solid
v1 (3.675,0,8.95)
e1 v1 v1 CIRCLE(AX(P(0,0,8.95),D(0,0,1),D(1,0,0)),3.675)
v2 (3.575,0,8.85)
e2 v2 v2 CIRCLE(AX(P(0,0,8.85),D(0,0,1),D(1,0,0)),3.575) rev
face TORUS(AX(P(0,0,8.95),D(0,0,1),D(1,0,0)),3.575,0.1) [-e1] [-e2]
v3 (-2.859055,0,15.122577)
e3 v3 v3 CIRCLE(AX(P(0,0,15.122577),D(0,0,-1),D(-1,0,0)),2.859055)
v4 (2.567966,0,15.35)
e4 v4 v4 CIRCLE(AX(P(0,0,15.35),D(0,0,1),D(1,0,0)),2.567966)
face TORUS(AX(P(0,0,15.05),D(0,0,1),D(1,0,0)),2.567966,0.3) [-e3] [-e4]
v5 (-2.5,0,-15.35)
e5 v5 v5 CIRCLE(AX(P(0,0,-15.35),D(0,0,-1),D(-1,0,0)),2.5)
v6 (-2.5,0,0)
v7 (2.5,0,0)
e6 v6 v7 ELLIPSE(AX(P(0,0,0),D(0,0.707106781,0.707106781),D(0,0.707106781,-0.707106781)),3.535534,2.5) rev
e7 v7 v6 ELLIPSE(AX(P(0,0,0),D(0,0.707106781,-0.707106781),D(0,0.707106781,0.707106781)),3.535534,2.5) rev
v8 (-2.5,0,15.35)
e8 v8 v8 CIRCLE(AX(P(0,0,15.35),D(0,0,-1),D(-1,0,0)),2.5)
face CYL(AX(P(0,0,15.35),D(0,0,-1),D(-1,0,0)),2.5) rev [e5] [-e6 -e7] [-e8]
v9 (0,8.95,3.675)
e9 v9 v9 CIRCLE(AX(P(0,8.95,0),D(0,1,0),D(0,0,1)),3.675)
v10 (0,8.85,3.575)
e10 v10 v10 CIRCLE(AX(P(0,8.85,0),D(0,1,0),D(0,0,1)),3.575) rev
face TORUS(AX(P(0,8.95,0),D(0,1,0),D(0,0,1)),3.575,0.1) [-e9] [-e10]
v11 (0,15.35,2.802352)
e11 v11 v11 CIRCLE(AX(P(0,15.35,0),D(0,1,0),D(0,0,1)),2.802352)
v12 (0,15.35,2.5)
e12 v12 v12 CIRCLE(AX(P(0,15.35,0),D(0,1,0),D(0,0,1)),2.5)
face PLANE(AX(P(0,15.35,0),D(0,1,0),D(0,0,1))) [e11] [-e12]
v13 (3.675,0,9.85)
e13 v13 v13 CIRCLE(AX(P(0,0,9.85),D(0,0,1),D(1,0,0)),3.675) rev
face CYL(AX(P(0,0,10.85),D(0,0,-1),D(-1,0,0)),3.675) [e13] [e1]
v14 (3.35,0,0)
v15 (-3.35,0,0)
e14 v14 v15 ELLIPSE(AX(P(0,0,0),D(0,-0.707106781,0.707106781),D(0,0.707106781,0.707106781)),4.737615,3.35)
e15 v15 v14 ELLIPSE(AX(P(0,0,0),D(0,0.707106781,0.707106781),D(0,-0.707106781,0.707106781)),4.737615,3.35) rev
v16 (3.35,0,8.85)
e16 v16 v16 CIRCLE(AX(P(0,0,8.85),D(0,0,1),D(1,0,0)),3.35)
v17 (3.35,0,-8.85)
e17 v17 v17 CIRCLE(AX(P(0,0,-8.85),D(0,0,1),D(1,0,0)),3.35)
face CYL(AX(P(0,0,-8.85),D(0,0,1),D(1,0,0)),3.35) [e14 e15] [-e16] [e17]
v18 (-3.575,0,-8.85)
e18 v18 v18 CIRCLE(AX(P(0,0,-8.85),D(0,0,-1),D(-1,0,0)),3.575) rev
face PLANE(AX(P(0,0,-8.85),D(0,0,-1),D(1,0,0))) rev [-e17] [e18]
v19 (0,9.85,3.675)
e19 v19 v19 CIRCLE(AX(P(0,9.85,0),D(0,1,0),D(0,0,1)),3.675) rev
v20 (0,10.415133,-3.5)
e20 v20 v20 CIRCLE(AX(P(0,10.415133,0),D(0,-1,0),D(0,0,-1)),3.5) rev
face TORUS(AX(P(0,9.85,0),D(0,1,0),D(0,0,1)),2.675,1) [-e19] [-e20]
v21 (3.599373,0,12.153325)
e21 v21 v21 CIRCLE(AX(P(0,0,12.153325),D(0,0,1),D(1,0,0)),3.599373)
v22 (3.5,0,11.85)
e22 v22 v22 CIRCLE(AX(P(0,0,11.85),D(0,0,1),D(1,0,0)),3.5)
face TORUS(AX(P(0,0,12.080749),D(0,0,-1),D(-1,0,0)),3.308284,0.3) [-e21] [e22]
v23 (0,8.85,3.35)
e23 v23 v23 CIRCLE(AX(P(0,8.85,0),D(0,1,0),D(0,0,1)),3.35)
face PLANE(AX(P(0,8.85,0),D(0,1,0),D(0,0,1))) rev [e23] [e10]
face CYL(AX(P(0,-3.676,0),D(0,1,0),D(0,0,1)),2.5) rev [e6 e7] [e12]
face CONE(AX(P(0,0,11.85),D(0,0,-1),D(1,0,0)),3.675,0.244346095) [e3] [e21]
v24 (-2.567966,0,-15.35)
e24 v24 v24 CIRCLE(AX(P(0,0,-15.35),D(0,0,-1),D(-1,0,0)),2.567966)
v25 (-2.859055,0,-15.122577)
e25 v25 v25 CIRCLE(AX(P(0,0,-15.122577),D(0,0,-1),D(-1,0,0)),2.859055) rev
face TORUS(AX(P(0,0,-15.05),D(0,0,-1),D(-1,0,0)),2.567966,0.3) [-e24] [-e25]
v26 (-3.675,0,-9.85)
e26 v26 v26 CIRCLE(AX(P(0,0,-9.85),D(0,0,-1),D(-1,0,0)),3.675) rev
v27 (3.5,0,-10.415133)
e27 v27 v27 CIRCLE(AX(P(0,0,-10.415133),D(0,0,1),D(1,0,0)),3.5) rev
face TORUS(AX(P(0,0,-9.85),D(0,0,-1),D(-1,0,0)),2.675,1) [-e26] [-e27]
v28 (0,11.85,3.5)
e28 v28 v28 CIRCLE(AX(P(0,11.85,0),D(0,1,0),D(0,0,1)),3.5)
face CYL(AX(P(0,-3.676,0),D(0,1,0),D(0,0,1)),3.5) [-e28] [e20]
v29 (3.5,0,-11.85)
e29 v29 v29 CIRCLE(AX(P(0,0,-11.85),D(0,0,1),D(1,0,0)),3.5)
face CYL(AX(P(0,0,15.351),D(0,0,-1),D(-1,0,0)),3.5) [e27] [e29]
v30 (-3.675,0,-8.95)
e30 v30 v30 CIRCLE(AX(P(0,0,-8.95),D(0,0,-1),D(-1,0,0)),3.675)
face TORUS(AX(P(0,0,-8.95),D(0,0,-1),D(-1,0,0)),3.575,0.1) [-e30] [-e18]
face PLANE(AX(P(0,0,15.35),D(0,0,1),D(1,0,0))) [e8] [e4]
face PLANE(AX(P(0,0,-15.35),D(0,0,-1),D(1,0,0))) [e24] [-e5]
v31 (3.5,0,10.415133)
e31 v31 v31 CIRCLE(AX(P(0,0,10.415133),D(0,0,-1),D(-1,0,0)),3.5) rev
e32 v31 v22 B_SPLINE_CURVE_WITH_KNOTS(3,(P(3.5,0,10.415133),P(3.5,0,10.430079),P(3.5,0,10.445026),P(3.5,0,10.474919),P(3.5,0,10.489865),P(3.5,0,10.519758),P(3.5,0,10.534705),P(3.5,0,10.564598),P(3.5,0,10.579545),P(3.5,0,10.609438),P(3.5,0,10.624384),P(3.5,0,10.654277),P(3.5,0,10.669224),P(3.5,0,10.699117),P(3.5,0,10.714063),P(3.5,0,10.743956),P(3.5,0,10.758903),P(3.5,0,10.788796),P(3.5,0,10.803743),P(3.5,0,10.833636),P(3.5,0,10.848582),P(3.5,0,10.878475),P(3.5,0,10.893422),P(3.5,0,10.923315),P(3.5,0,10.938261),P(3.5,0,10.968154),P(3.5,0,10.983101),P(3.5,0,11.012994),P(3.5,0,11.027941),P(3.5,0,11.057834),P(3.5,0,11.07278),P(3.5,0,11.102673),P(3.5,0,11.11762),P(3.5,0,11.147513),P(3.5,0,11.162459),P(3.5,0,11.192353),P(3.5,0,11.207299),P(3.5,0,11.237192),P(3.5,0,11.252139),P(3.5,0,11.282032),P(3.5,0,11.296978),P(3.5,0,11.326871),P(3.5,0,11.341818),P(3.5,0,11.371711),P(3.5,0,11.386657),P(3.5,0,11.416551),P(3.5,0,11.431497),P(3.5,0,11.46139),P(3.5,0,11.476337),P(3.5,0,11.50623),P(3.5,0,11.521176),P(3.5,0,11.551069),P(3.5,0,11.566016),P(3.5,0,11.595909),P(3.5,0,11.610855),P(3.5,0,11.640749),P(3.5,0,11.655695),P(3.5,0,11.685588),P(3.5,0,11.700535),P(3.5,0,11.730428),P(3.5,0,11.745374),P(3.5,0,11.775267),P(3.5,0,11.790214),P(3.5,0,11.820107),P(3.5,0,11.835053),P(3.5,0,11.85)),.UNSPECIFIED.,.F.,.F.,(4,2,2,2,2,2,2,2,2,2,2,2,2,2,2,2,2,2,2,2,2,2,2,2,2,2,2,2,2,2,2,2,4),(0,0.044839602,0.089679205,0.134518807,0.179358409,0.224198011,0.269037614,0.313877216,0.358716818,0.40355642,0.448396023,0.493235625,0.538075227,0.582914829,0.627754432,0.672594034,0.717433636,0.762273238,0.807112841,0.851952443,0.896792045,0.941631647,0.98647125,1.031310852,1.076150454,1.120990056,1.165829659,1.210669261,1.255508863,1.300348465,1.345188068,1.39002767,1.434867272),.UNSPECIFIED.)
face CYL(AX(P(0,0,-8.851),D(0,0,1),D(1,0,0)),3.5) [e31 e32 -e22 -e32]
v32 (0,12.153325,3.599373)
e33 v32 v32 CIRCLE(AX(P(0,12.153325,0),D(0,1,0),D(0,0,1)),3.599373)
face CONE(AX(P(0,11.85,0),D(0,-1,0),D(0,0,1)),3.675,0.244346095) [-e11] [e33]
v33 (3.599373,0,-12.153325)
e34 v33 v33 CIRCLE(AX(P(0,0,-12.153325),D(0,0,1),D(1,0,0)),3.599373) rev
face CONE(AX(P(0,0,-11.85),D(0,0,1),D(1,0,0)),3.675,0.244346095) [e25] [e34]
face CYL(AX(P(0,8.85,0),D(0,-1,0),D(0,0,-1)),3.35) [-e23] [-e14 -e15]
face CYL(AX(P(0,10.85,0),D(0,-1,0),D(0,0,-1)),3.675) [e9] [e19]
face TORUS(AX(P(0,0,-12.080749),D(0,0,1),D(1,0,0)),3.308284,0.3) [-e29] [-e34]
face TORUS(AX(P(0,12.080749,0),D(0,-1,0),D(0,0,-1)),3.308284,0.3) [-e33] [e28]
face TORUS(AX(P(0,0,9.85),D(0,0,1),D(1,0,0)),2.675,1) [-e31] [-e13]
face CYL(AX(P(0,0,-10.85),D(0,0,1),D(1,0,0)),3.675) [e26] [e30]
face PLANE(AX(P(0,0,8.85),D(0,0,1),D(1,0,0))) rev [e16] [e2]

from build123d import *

# Parameters (mm, degrees)
BOSS_EXTRUDE1_DEPTH             = 8.85
BOSS_EXTRUDE1_DEPTH_BACK        = 8.85
SKETCH1_R                       = 3.35
SKETCH2_R                       = 3.675
BOSS_EXTRUDE2_DEPTH             = 2
FILLET1_R                       = 1
SKETCH4_R                       = 3.5
BOSS_EXTRUDE3_DEPTH             = 1
BOSS_EXTRUDE3_DIRECTION_2_REACH = 22.374
SKETCH5_R                       = 3.675
BOSS_EXTRUDE4_DEPTH             = 3.5
BOSS_EXTRUDE4_TAPER             = 14
FILLET2_R                       = 0.3
FILLET3_R                       = 0.1
SKETCH7_R                       = 3.35
BOSS_EXTRUDE5_DEPTH             = 8.85
SKETCH6_R                       = 2.5
CUT_EXTRUDE1_DEPTH              = 33.160816621
SKETCH8_R                       = 3.675
BOSS_EXTRUDE6_DEPTH             = 2
FILLET4_R                       = 1
SKETCH9_R                       = 3.5
BOSS_EXTRUDE7_DEPTH             = 1
BOSS_EXTRUDE7_DIRECTION_2_REACH = 23.45
SKETCH10_R                      = 3.675
BOSS_EXTRUDE8_DEPTH             = 3.5
BOSS_EXTRUDE8_TAPER             = 14
CUT_EXTRUDE2_REACH              = 26.72
CUT_EXTRUDE2_END_RADIUS         = 2.5
SKETCH11_R                      = 2.5
FILLET5_R                       = 0.3
FILLET6_R                       = 0.1


# Read off the part's stored shape, not the designer's step: Mirror1
with BuildPart() as part:
    # Sketch1 → Boss-Extrude1 (new, two sides: drawn at the far end of the back side and taken through both)
    with BuildSketch(Plane.XY.offset(-BOSS_EXTRUDE1_DEPTH_BACK)):
        Circle(SKETCH1_R)
    extrude(amount=BOSS_EXTRUDE1_DEPTH + BOSS_EXTRUDE1_DEPTH_BACK)

    # Sketch2 → Boss-Extrude2 (add)
    with BuildSketch(Plane.XY.offset(8.85)):
        Circle(SKETCH2_R)
    extrude(amount=BOSS_EXTRUDE2_DEPTH)

    # Fillet1
    fillet1_edges = [part.edges().sort_by_distance(p)[0] for p in [
        (-3.675, 0, 10.85),
    ]]
    fillet(fillet1_edges, radius=FILLET1_R)

    # Sketch4 → Boss-Extrude3 (add)
    with BuildSketch(Plane.XY.offset(10.85)):
        Circle(SKETCH4_R)
    extrude(amount=BOSS_EXTRUDE3_DEPTH)

    # Sketch4 → Boss-Extrude3 direction 2 (add, up to next)
    with BuildSketch(Plane.XY.offset(10.85), mode=Mode.PRIVATE) as boss_extrude3_direction_2_sk1:
        Circle(SKETCH4_R)
    boss_extrude3_direction_2_tool1 = extrude(boss_extrude3_direction_2_sk1.sketch, amount=-BOSS_EXTRUDE3_DIRECTION_2_REACH, mode=Mode.PRIVATE) - part.part
    add(boss_extrude3_direction_2_tool1.solids().sort_by_distance((0, 0, 10.85))[0])

    # Sketch5 → Boss-Extrude4 (add)
    with BuildSketch(Plane.XY.offset(11.85)):
        Circle(SKETCH5_R)
    extrude(amount=BOSS_EXTRUDE4_DEPTH, taper=BOSS_EXTRUDE4_TAPER)

    # Fillet2
    # the kernel refuses this fillet: 0.3 mm, written as the material it takes off along each edge
    with BuildSketch(Plane(origin=(0, 0, 11.85), x_dir=(1, 0, 0), z_dir=(0, 1, 0))) as fillet2_piece_1:
        with BuildLine():
            CenterArc((3.308283827, -0.230748584), FILLET2_R, 346, 64.278692047)
            Line((3.599372545, -0.303325153), (3.60519432, -0.304776684))
            Line((3.60519432, -0.304776684), (3.680821774, -0.001451531))
            Line((3.680821774, -0.001451531), (3.675, 0.006))
            ThreePointArc((3.675, 0.006), (3.5875, 0.006), (3.503834323, 0.004614972))
            Line((3.503834323, 0.004614972), (3.5, 0))
        make_face()
    revolve(axis=Axis((0, 0, 11.85), (0, 0, -1)), mode=Mode.SUBTRACT)
    with BuildSketch(Plane(origin=(0, 0, 15.35), x_dir=(1, 0, 0), z_dir=(0, 1, 0))) as fillet2_piece_2:
        with BuildLine():
            CenterArc((2.80235199 - FILLET2_R * 0.781285626507, FILLET2_R), FILLET2_R, 270, 76)
            Line((2.80235199 - FILLET2_R * 0.781285626507, 0), (2.80235199 - FILLET2_R * 0.781285626507, -FILLET2_R * 0.02))
            Line((2.80235199 - FILLET2_R * 0.781285626507, -FILLET2_R * 0.02), (2.80235199 + FILLET2_R * 0.0156257125301, -FILLET2_R * 0.02))
            Line((2.80235199 + FILLET2_R * 0.0156257125301, -FILLET2_R * 0.02), (2.80235199 + FILLET2_R * 0.208416014295, FILLET2_R * 0.753239666488))
            Line((2.80235199 + FILLET2_R * 0.208416014295, FILLET2_R * 0.753239666488), (2.80235199 + FILLET2_R * 0.189010099769, FILLET2_R * 0.7580781044))
        make_face()
    revolve(axis=Axis((0, 0, 15.35), (0, 0, -1)), mode=Mode.SUBTRACT)

    # Fillet3
    fillet3_edges = [part.edges().sort_by_distance(p)[0] for p in [
        (-3.675, 0, 8.85),
    ]]
    fillet(fillet3_edges, radius=FILLET3_R)

    # Mirror1 outline → Mirror1 (revolve)
    with BuildSketch(Plane.XZ):
        with BuildLine():
            ThreePointArc((3.5, -10.415132728), (3.630248659, -10.145803989), (3.675, -9.85))
            Line((3.675, -9.85), (3.675, -8.95))
            ThreePointArc((3.675, -8.95), (3.645710678, -8.879289322), (3.575, -8.85))
            Line((3.575, -8.85), (0, -8.85))
            Line((0, -8.85), (0, -15.35))
            Line((0, -15.35), (2.567966302, -15.35))
            ThreePointArc((2.567966302, -15.35), (2.752664745, -15.286403226), (2.85905502, -15.122576569))
            Line((2.85905502, -15.122576569), (3.599372545, -12.153325153))
            ThreePointArc((3.599372545, -12.153325153), (3.593374476, -11.987349857), (3.5, -11.85))
            Line((3.5, -11.85), (3.5, -10.415132728))
        make_face()
    revolve(axis=Axis((0, 0, 0), (0, 0, 1)))

    # Sketch7 → Boss-Extrude5 (add)
    with BuildSketch(Plane(origin=(0, 0, 0), x_dir=(1, 0, 0), z_dir=(0, 1, 0))):
        Circle(SKETCH7_R)
    extrude(amount=BOSS_EXTRUDE5_DEPTH)

    # Sketch6 → Cut-Extrude1 (cut, through all)
    with BuildSketch(Plane(origin=(0, 0, -15.35), x_dir=(-1, 0, 0), z_dir=(0, 0, -1))):
        Circle(SKETCH6_R)
    extrude(amount=-CUT_EXTRUDE1_DEPTH, mode=Mode.SUBTRACT)

    # Sketch8 → Boss-Extrude6 (add)
    with BuildSketch(Plane(origin=(0, 8.85, 0), x_dir=(1, 0, 0), z_dir=(0, 1, 0))):
        with Locations(Location((0, 0, 0), (0, 0, 270))):
            Circle(SKETCH8_R)
    extrude(amount=BOSS_EXTRUDE6_DEPTH)

    # Fillet4
    fillet4_edges = [part.edges().sort_by_distance(p)[0] for p in [
        (0, 10.85, -3.675),
    ]]
    fillet(fillet4_edges, radius=FILLET4_R)

    # Sketch9 → Boss-Extrude7 (add)
    with BuildSketch(Plane(origin=(0, 10.85, 0), x_dir=(1, 0, 0), z_dir=(0, 1, 0))):
        with Locations(Location((0, 0, 0), (0, 0, 270))):
            Circle(SKETCH9_R)
    extrude(amount=BOSS_EXTRUDE7_DEPTH)

    # Sketch9 → Boss-Extrude7 direction 2 (add, up to next)
    with BuildSketch(Plane(origin=(0, 10.85, 0), x_dir=(1, 0, 0), z_dir=(0, 1, 0)), mode=Mode.PRIVATE) as boss_extrude7_direction_2_sk1:
        with Locations(Location((0, 0, 0), (0, 0, 270))):
            Circle(SKETCH9_R)
    boss_extrude7_direction_2_tool1 = extrude(boss_extrude7_direction_2_sk1.sketch, amount=-BOSS_EXTRUDE7_DIRECTION_2_REACH, mode=Mode.PRIVATE) - part.part
    add(boss_extrude7_direction_2_tool1.solids().sort_by_distance((0, 10.85, 0))[0])

    # Sketch10 → Boss-Extrude8 (add)
    with BuildSketch(Plane(origin=(0, 11.85, 0), x_dir=(1, 0, 0), z_dir=(0, 1, 0))):
        with Locations(Location((0, 0, 0), (0, 0, 270))):
            Circle(SKETCH10_R)
    extrude(amount=BOSS_EXTRUDE8_DEPTH, taper=BOSS_EXTRUDE8_TAPER)

    # Cut-Extrude2: up to this cylinder (the profile starts outside it)
    cut_extrude2_end = Plane(origin=(0, 0, 0), z_dir=(0, 0, -1)) * Cylinder(CUT_EXTRUDE2_END_RADIUS, 59.44, mode=Mode.PRIVATE)
    # Sketch11 → Cut-Extrude2 (cut, up to the surface)
    with BuildSketch(Plane(origin=(0, 15.35, 0), x_dir=(1, 0, 0), z_dir=(0, 1, 0)), mode=Mode.PRIVATE) as cut_extrude2_sk1:
        with Locations(Location((0, 0, 0), (0, 0, 270))):
            Circle(SKETCH11_R)
    cut_extrude2_tool1 = extrude(cut_extrude2_sk1.sketch, amount=-CUT_EXTRUDE2_REACH, mode=Mode.PRIVATE) - cut_extrude2_end
    add(cut_extrude2_tool1.solids().sort_by_distance((0, 15.35, 0))[0], mode=Mode.SUBTRACT)

    # Fillet5
    # the kernel refuses this fillet: 0.3 mm, written as the material it takes off along each edge
    with BuildSketch(Plane(origin=(0, 11.85, 0), x_dir=(0, 0, 1), z_dir=(-1, 0, 0))) as fillet5_piece_1:
        with BuildLine():
            CenterArc((3.308283827, 0.230748584), FILLET5_R, 309.721307953, 64.278692047)
            Line((3.5, 0), (3.503834323, -0.004614972))
            ThreePointArc((3.503834323, -0.004614972), (3.5875, -0.006), (3.675, -0.006))
            Line((3.675, -0.006), (3.680821774, 0.001451531))
            Line((3.680821774, 0.001451531), (3.60519432, 0.304776684))
            Line((3.60519432, 0.304776684), (3.599372545, 0.303325153))
        make_face()
    revolve(axis=Axis((0, 11.85, 0), (0, 1, 0)), mode=Mode.SUBTRACT)

    # Fillet6
    fillet6_edges = [part.edges().sort_by_distance(p)[0] for p in [
        (0, 8.85, -3.675),
    ]]
    fillet(fillet6_edges, radius=FILLET6_R)


solid = part.part
